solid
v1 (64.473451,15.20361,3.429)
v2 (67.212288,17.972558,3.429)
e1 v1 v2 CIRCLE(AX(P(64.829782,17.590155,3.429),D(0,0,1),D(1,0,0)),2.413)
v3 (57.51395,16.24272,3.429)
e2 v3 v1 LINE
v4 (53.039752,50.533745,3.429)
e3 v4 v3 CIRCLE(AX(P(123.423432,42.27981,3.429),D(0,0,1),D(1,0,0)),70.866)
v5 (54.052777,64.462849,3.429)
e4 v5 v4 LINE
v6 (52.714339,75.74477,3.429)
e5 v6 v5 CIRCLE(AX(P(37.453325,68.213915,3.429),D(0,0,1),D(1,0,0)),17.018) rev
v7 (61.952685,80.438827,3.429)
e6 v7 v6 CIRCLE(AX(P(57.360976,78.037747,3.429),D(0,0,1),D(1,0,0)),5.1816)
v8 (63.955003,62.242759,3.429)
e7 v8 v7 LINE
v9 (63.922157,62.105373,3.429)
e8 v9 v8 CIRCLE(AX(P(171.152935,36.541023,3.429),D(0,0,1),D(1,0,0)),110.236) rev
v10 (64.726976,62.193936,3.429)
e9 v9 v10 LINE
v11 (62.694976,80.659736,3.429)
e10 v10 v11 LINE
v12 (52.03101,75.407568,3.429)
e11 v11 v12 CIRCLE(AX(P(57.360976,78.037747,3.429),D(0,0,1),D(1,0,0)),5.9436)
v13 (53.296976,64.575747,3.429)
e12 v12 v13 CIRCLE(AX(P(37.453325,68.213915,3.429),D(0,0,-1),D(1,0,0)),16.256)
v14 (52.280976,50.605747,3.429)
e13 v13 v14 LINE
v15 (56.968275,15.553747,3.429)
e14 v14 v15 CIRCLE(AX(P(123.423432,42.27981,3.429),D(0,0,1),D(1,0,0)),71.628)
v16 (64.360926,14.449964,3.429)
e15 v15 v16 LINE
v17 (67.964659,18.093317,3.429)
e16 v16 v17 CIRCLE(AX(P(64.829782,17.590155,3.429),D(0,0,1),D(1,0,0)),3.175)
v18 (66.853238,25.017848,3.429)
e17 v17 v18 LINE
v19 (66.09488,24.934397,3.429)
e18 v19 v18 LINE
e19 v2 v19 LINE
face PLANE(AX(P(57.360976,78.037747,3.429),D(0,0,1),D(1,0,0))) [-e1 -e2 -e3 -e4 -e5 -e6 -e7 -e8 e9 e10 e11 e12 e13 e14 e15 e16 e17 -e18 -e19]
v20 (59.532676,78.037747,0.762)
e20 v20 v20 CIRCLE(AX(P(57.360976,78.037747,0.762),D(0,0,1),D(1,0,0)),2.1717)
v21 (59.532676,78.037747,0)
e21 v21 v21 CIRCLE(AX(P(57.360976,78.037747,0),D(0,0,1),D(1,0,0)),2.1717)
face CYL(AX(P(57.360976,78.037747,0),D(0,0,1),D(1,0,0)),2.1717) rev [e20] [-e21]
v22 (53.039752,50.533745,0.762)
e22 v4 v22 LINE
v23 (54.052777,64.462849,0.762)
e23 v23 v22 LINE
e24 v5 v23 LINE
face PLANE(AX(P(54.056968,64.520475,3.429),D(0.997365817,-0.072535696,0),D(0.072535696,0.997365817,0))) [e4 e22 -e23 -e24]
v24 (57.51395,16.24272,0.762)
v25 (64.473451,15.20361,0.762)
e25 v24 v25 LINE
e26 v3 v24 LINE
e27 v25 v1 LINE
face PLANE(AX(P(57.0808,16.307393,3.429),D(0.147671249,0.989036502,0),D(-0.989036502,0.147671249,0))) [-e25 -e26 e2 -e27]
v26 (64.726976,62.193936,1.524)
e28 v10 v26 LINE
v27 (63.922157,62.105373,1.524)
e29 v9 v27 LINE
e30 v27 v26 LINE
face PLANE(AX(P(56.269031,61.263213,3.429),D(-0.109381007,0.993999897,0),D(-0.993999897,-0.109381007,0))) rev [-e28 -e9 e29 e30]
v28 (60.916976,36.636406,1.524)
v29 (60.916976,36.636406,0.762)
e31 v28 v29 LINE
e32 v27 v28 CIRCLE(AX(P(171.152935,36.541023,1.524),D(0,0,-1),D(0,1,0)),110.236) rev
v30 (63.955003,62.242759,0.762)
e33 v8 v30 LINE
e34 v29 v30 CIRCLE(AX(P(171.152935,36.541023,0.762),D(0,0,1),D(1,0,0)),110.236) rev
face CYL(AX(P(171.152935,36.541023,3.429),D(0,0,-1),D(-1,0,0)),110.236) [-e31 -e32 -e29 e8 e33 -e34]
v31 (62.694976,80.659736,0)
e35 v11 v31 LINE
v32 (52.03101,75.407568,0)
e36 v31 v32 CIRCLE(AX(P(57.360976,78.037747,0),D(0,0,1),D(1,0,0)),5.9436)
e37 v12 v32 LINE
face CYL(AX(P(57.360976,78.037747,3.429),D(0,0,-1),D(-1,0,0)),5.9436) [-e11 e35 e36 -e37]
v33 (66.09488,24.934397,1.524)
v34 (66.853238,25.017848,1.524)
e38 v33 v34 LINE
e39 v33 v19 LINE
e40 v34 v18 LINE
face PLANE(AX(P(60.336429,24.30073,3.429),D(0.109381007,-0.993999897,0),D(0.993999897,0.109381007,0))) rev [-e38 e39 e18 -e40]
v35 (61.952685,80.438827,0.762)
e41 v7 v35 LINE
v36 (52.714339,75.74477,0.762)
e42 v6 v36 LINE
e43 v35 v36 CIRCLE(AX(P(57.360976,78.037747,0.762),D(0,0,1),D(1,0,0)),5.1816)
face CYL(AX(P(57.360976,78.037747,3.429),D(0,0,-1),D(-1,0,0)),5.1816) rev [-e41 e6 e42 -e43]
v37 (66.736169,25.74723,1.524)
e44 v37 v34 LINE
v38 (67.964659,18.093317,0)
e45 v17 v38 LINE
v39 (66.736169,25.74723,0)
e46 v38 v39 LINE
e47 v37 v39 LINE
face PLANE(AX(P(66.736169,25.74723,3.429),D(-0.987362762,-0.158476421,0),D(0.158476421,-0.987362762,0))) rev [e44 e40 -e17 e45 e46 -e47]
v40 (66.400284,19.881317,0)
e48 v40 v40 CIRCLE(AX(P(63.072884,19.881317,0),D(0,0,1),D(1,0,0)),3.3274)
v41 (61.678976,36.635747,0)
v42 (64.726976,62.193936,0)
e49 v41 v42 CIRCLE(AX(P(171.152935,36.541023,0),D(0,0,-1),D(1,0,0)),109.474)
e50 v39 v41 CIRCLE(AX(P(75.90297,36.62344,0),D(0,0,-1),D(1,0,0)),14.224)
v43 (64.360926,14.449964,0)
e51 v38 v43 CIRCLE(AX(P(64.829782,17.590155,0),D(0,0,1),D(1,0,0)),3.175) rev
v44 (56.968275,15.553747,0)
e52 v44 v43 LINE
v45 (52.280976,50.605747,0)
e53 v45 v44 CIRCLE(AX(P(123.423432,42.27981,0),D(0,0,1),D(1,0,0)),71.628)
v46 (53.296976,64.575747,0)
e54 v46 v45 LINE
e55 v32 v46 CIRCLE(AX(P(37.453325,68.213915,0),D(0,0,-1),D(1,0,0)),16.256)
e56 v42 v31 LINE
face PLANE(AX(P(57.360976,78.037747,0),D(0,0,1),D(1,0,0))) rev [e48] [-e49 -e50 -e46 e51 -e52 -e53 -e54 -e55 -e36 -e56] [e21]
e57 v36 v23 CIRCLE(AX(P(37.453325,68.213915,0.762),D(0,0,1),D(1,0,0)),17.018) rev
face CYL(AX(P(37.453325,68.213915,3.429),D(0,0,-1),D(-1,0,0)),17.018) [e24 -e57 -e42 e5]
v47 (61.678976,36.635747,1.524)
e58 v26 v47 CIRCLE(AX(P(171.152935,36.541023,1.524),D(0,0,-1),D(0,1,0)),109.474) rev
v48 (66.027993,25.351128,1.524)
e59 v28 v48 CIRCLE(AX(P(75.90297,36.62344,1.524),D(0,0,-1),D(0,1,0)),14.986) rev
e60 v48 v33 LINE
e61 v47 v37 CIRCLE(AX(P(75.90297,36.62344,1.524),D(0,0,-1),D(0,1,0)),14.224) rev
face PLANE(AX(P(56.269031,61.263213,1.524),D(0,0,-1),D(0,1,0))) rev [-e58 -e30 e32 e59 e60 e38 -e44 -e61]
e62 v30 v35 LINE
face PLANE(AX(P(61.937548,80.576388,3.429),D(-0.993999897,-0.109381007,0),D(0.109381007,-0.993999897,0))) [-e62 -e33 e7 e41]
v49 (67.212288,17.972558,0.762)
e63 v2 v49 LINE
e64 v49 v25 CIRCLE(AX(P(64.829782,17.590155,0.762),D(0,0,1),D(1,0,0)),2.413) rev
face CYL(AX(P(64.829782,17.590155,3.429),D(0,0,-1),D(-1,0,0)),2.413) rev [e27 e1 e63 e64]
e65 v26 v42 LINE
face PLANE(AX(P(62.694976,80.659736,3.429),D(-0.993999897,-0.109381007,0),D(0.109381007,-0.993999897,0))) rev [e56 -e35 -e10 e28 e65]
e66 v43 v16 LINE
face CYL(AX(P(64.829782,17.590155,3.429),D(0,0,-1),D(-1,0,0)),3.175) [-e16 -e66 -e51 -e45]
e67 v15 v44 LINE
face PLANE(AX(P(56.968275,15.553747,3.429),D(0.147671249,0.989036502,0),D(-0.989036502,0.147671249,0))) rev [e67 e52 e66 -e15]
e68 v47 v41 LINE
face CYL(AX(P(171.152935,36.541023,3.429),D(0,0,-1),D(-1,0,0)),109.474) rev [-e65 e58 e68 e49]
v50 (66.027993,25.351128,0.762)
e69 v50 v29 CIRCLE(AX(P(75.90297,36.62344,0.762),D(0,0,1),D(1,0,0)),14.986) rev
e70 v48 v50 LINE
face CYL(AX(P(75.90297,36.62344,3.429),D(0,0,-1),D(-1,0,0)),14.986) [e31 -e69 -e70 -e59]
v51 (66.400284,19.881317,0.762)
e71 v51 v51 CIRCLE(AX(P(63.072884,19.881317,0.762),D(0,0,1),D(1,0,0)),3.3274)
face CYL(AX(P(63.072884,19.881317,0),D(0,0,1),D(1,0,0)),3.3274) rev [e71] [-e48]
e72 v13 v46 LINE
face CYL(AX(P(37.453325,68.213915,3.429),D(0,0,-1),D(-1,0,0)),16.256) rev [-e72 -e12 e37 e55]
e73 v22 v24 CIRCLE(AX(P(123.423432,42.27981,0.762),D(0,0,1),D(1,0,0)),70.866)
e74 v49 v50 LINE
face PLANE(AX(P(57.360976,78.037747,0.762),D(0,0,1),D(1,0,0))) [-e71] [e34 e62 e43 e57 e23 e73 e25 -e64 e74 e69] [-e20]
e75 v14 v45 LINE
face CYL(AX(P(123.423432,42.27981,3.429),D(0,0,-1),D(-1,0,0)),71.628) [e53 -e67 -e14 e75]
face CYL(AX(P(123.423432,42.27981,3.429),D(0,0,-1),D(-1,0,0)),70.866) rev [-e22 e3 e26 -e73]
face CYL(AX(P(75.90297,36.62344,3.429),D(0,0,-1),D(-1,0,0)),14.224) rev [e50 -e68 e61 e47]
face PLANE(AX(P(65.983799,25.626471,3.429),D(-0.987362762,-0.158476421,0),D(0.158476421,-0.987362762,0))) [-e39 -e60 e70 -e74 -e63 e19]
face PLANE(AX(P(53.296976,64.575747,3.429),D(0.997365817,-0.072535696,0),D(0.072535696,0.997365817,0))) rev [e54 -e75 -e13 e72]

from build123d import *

# Parameters (mm, degrees)
BOSS_EXTRUDE1_DEPTH = 3.429
FILLET1_R           = 3.175
SHELL1_START        = 0.762
SHELL1_DEPTH        = 2.667
SKETCH2_R           = 2.1717
SKETCH2_R_2         = 3.3274
CUT_EXTRUDE1_DEPTH  = 109.116950745
SKETCH4_W           = 1.905
SKETCH4_H           = 37.1856
CUT_EXTRUDE3_DEPTH  = 8.509


# Read off the part's stored shape, not the designer's step: Shell1
with BuildPart() as part:
    # Sketch1 → Boss-Extrude1 (new body)
    with BuildSketch(Plane.XY):
        with BuildLine():
            Line((62.694975666, 80.659735828), (64.726975666, 62.193935828))
            ThreePointArc((64.726975666, 62.193935828), (62.449213934, 49.504733029), (61.678975666, 36.635747087))
            ThreePointArc((61.678975666, 36.635747087), (63.002494237, 30.6317877), (66.736169072, 25.747230203))
            Line((66.736169072, 25.747230203), (68.652274874, 13.809230203))
            Line((68.652274874, 13.809230203), (56.968274874, 15.553747087))
            ThreePointArc((56.968274874, 15.553747087), (52.42740055, 32.785925059), (52.280975666, 50.605747087))
            Line((52.280975666, 50.605747087), (53.296975666, 64.575747087))
            ThreePointArc((53.296975666, 64.575747087), (53.599423451, 70.100985632), (52.031009659, 75.407567754))
            ThreePointArc((52.031009659, 75.407567754), (54.734890855, 83.369731663), (62.694975666, 80.659735828))
        make_face()
    extrude(amount=BOSS_EXTRUDE1_DEPTH)

    # Fillet1
    fillet1_edges = [part.edges().sort_by_distance(p)[0] for p in [
        (68.652274874, 13.809230203, 1.7145),
    ]]
    fillet(fillet1_edges, radius=FILLET1_R)

    # Shell1 outline → Shell1 (cut)
    with BuildSketch(Plane.XY.offset(SHELL1_START)):
        with BuildLine():
            ThreePointArc((61.952685119, 80.438826605), (55.013786801, 82.65723656), (52.714338634, 75.744770233))
            ThreePointArc((52.714338634, 75.744770233), (54.352815027, 70.218797874), (54.052777411, 64.462848531))
            Line((54.052777411, 64.462848531), (53.039751684, 50.533744782))
            ThreePointArc((53.039751684, 50.533744782), (53.153060273, 33.111126197), (57.513949579, 16.242720176))
            Line((57.513949579, 16.242720176), (64.473451012, 15.203609619))
            ThreePointArc((64.473451012, 15.203609619), (66.545332993, 15.893259626), (67.212288081, 17.972558303))
            Line((67.212288081, 17.972558303), (66.027992544, 25.351127953))
            ThreePointArc((66.027992544, 25.351127953), (62.25173003, 30.440896905), (60.916975951, 36.636406417))
            ThreePointArc((60.916975951, 36.636406417), (61.6846952, 49.528718986), (63.955003411, 62.242759133))
            Line((63.955003411, 62.242759133), (61.952685119, 80.438826605))
        make_face()
    extrude(amount=SHELL1_DEPTH, mode=Mode.SUBTRACT)

    # Sketch2 → Cut-Extrude1 (cut, through all)
    with BuildSketch(Plane.XY.offset(3.429)):
        with Locations((57.360975666, 78.037747087)):
            Circle(SKETCH2_R)
        with Locations((63.072884184, 19.881317109)):
            Circle(SKETCH2_R_2)
    extrude(amount=-CUT_EXTRUDE1_DEPTH, mode=Mode.SUBTRACT)

    # Sketch4 → Cut-Extrude3 (cut)
    with BuildSketch(Plane(origin=(70.714586477, 7.781522583, 0), x_dir=(0, 0, -1), z_dir=(0.9939998970848155, 0.1093810065567881, 0))):
        with Locations((-2.4765, 36.148064063)):
            Rectangle(SKETCH4_W, SKETCH4_H)
    extrude(amount=-CUT_EXTRUDE3_DEPTH, mode=Mode.SUBTRACT)


solid = part.part
